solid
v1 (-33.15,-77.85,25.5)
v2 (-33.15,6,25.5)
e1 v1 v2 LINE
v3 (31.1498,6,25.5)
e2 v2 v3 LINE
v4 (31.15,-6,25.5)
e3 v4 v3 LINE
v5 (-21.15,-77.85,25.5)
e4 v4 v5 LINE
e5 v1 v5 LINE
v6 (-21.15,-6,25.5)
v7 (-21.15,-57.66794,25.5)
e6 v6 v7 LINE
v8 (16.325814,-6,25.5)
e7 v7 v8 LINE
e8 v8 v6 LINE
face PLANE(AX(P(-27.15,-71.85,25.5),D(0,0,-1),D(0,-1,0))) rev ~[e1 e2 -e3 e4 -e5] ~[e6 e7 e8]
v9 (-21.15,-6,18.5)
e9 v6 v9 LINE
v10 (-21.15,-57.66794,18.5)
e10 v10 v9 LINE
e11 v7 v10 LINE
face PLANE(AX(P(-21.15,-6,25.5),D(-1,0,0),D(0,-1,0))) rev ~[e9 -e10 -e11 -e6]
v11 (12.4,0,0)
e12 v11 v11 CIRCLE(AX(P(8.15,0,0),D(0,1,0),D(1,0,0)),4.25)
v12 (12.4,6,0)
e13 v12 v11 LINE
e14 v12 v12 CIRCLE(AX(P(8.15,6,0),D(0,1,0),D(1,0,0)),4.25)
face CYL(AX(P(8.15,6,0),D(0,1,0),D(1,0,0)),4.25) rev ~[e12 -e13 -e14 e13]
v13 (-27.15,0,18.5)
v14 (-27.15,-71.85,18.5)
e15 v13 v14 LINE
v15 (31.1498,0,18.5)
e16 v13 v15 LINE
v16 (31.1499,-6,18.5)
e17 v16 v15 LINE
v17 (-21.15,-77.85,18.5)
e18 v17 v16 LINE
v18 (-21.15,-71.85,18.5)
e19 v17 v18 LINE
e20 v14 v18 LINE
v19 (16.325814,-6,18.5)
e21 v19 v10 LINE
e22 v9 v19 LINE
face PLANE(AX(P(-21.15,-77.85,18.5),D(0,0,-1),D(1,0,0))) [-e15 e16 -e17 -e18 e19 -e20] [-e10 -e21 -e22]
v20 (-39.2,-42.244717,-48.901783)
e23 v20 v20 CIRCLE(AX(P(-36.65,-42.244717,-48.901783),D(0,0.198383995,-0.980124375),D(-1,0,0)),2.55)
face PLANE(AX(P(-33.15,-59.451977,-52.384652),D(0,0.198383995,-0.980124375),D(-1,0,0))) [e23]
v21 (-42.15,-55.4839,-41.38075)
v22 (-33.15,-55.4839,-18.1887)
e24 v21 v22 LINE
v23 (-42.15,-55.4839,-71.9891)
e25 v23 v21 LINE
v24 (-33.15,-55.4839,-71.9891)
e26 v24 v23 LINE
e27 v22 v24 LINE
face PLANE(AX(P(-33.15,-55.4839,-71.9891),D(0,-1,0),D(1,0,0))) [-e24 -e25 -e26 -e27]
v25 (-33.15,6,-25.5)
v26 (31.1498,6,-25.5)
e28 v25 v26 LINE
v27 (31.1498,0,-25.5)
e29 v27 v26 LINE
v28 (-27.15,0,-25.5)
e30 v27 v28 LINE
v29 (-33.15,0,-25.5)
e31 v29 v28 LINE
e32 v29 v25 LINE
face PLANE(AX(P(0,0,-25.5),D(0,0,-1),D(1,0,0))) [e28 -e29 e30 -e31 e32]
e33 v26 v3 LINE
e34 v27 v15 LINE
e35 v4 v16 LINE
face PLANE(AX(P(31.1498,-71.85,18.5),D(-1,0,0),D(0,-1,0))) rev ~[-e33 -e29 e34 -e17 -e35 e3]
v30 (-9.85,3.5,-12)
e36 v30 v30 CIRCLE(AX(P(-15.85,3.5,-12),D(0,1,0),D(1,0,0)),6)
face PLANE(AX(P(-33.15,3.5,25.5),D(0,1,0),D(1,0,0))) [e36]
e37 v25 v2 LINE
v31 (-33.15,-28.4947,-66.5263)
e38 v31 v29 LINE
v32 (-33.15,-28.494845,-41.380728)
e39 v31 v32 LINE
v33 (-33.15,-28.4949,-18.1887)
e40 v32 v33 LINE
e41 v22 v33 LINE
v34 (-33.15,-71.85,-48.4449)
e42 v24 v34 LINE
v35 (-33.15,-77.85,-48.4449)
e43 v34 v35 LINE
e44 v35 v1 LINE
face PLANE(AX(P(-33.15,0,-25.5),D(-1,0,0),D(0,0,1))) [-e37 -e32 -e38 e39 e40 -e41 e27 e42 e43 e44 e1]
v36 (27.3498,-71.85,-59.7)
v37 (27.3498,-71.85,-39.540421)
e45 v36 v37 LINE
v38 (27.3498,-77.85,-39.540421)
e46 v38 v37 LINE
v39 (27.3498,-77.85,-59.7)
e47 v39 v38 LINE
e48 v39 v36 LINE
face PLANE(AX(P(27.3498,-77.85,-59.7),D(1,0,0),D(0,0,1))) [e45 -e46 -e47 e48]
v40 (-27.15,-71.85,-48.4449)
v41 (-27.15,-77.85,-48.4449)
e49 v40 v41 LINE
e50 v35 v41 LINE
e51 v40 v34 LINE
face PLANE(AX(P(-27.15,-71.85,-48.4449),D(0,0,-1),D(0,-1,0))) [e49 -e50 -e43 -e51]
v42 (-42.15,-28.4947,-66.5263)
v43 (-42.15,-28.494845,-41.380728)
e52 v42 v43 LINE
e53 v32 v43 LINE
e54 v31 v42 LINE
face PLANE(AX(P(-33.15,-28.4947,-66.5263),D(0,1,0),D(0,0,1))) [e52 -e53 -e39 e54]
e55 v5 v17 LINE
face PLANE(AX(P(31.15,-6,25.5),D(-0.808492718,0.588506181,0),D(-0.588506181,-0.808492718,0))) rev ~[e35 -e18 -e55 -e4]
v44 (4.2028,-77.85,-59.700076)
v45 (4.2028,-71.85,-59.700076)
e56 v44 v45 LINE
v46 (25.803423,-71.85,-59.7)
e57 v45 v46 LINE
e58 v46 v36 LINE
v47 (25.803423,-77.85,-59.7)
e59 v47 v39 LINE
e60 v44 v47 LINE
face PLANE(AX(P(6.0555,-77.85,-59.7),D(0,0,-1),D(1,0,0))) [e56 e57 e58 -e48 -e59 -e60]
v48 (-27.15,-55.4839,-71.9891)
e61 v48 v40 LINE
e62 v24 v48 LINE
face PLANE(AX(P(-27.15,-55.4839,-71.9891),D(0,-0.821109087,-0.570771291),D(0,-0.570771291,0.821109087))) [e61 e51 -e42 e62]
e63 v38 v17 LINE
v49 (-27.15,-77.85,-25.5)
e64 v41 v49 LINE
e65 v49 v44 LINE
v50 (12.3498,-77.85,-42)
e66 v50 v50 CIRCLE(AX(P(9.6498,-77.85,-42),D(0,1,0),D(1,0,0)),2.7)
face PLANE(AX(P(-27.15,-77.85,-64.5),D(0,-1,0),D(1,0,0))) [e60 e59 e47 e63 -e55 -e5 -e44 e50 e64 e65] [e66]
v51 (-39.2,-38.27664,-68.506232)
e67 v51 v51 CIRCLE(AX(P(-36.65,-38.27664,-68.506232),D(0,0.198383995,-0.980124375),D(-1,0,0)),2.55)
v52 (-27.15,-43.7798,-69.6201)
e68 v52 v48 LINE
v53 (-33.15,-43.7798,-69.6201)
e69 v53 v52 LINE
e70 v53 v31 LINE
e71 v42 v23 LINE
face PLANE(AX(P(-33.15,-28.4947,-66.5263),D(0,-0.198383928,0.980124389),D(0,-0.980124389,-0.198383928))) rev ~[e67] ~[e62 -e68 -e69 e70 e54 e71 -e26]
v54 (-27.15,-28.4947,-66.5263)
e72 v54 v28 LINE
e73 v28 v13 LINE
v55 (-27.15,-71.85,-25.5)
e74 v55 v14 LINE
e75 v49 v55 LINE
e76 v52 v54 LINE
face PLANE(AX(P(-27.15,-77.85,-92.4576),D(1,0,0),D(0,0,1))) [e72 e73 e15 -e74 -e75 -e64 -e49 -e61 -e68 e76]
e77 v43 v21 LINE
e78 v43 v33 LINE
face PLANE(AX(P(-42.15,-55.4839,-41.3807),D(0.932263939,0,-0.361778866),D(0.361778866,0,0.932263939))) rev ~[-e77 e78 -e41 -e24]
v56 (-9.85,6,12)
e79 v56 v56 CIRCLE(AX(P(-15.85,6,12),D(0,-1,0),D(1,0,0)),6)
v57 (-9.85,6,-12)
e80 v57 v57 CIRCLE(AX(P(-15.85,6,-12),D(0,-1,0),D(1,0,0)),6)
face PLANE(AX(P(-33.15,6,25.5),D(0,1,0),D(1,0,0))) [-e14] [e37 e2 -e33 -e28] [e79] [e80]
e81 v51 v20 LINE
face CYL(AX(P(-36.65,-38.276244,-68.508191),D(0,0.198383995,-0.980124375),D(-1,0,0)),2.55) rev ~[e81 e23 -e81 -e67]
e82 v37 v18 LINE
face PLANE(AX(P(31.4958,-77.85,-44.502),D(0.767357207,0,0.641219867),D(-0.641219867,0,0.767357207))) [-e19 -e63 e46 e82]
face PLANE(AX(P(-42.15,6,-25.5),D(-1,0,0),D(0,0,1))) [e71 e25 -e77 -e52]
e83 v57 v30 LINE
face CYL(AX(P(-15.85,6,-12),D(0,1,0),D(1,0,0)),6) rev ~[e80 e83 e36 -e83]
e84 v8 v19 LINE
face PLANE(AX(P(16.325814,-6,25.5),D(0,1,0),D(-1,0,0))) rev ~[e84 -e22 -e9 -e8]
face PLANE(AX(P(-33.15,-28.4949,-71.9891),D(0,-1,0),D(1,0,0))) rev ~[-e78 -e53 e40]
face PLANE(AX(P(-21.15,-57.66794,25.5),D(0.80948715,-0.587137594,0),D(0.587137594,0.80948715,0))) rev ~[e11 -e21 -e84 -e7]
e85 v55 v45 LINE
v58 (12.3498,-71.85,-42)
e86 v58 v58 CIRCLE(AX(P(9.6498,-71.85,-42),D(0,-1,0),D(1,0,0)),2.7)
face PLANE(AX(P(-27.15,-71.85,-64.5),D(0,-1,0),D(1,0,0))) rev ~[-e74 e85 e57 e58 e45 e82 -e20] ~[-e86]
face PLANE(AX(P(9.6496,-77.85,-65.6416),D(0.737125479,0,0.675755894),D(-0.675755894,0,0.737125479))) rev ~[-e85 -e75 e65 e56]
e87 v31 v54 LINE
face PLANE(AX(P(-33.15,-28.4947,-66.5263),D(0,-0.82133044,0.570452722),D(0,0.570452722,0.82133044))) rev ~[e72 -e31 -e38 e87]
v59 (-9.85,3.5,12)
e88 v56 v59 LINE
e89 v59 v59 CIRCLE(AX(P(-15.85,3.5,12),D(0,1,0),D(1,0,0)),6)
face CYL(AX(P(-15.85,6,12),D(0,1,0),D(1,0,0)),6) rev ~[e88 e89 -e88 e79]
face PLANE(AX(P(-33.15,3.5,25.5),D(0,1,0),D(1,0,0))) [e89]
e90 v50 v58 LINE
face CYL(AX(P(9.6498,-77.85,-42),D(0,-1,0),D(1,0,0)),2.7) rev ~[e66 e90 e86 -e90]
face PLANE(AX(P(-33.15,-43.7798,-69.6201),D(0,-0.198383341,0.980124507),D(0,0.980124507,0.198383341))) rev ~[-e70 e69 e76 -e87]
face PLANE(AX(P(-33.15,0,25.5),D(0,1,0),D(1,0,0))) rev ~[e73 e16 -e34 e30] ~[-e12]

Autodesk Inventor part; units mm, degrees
ref_plane "YZ Plane" through (0, 0, 0) normal (1, 0, 0) x (0, 1, 0)
ref_plane "XZ Plane" through (0, 0, 0) normal (0, 1, 0) x (-1, 0, 0)
ref_plane "XY Plane" through (0, 0, 0) normal (0, 0, 1) x (1, 0, 0)
sketch "Sketch1" plane through (0, 0, 0) normal (0, 1, 0) x (-1, 0, 0)
  line L0 (0, -25.5) -> (-34.15, -25.5)
  line L1 (-34.15, -25.5) -> (-34.15, 0)
  line L2 (-34.15, 0) -> (-34.15, 25.5)
  line L3 (-34.15, 25.5) -> (0, 25.5)
  line L4 (0, 25.5) -> (34.15, 25.5)
  line L5 (34.15, 25.5) -> (34.15, 0)
  line L6 (34.15, 0) -> (34.15, -25.5)
  line L7 (34.15, -25.5) -> (0, -25.5)
  point P0 (0, 0)
extrude "Extrusion1" add sketch "Sketch1" along normal blind 7
sketch "Sketch3" plane through (-34.15, 0, 25.5) normal (0, 0, 1) x (1, 0, 0)
  line L0 (0, 0) -> (0, -78.85)
  point P0 (34.15, 0)
  dimension "d7" = 78.85
sketch "Sketch4" plane through (-34.15, 0, -25.5) normal (-1, 0, 0) x (0, 0, 1)
  line L0 (51, 0) -> (51, -78.85)
  line L1 (51, -78.85) -> (-39, -78.85)
  line L2 (-39, -78.85) -> (-39, -71.85)
  line L3 (0, 0) -> (-39, -71.85)
  line L4 (0, 0) -> (51, 0)
  point P0 (25.5, 0)
  dimension "d10" = 90
  dimension "d11" = 7
extrude "Extrusion2" add sketch "Sketch4" against normal blind 7
sketch "Sketch6" plane through (0, 7, 0) normal (0, 1, 0) x (1, 0, 0)
  line L0 (34.15, -25.5) -> (34.15, 25.5) projected
  line L1 (34.15, 25.5) -> (34.15, 0)
  line L2 (-34.15, 25.5) -> (-34.15, -25.5) projected
  circle A0 centre (8.15, 0) radius 5
  point P0 (0, 0)
  dimension "d20" = 10
extrude "Extrusion4" cut sketch "Sketch6" against normal blind 10
sketch "Sketch7" plane through (-27.15, 0, -25.5) normal (1, 0, 0) x (0, 0, -1)
  line L0 (-51, -78.85) -> (39, -78.85) projected
  line L1 (-51, -78.85) -> (39, -78.85)
  line L2 (39, -78.85) -> (39, -71.85) projected
  line L3 (39, -78.85) -> (39, -71.85)
  line L4 (39, -71.85) -> (-51, -71.85)
  line L5 (-51, 0) -> (-51, -78.85) projected
  line L6 (-51, -78.85) -> (-51, -71.85)
  point P0 (-25.5, 0)
sketch "Sketch8" plane through (0, 0, 0) normal (0, -1, 0) x (1, 0, 0)
  circle A0 centre (8.15, 0) radius 5 projected
  line L0 (8.15, 18.5) -> (34.15, 18.5)
  line L1 (34.15, 25.5) -> (34.15, -25.5) projected
  line L2 (8.15, 25.5) -> (34.15, 25.5)
  line L3 (8.15, 25.5) -> (-27.15, 25.5)
  line L4 (-27.15, 25.5) -> (-27.15, -25.5) projected
  line L5 (8.15, 18.5) -> (-27.15, 18.5)
  line L6 (34.15, 25.5) -> (34.15, 18.5)
  line L7 (-27.15, 25.5) -> (-27.15, 18.5)
  point P0 (0, 0)
extrude "Extrusion6" add sketch "Sketch7" along normal blind 58.5
extrude "Extrusion7" add sketch "Sketch8" along normal blind 78.75 contours L5 L4 L3 L2 L1 L0
sketch "Sketch9" plane through (31.35, 0, -25.5) normal (1, 0, 0) x (0, 0, -1)
  line L0 (-51, -78.75) -> (-51, 7) projected
  line L1 (-44, 0) -> (-44, -71.85) projected
  line L2 (-51, -78.75) -> (-44, -78.75)
  line L3 (-44, -78.75) -> (-44, -71.85)
  line L4 (-44, -71.85) -> (-51, -71.85)
  line L5 (-51, -71.85) -> (-51, -78.75)
  point P0 (-25.5, 0)
extrude "Extrusion8" cut sketch "Sketch9" along normal blind 10
sketch "Sketch10" plane through (0, 7, 0) normal (0, 1, 0) x (1, 0, 0)
  point P0 (0, 0)
sketch "Boceto11" plane through (-34.15, -78.85, -64.5) normal (0, -1, 0) x (1, 0, 0)
  line L0 (72.0718, 89.9914) -> (72.0718, 37.9883)
  line L1 (72.0718, 37.9883) -> (65.5278, 37.9883)
  line L2 (65.5278, 37.9883) -> (65.5278, 89.9914)
  line L3 (72.0718, 89.9914) -> (72.0718, 92.1751)
  line L4 (72.0718, 92.1751) -> (65.5278, 92.1751)
  line L5 (65.5278, 92.1751) -> (65.5278, 89.9914)
  point P0 (34.15, 64.5)
extrude "Extrusión9" cut sketch "Boceto11" against normal blind 1000
sketch "Boceto18" plane through (-34.15, -78.85, 25.5) normal (0, 0, 1) x (1, 0, 0)
  point P0 (34.15, 78.85)
sketch "Boceto23" plane through (-27.15, 0, -25.5) normal (0, 0.4770514, -0.8788754) x (-1, 0, 0)
  point P0 (-27.15, 12.1648)
sketch "Boceto24" plane through (-27.15, 0, -25.5) normal (0, 0, -1) x (-1, 0, 0)
  line L0 (7, -71.85) -> (7, -78.85) projected
  line L1 (7, -78.35) -> (7, -78.85)
  line L2 (7, -78.85) -> (-58.5, -78.85) projected
  line L3 (-58.5, -78.85) -> (-58.5, -77.85)
  line L4 (-58.5, -71.85) -> (-58.5, -78.85) projected
  line L5 (-58.5, -77.85) -> (6, -77.85)
  line L6 (7, -77.85) -> (7, -78.85)
  line L7 (7, -78.85) -> (-58.8392, -78.85)
  line L8 (-58.5278, 7) -> (7, 7) projected
  line L9 (7, -78.85) -> (7, 7)
  line L10 (7, 7) -> (6, 7)
  line L11 (6, 6) -> (6, -77.85)
  line L12 (-58.5278, -71.85) -> (-58.5278, 7) projected
  line L13 (-58.5278, 7) -> (-58.5278, 6)
  line L14 (-58.5278, 6) -> (6, 6)
  line L15 (7, 0) -> (7, 7) projected
  line L16 (7, 6) -> (7, 7)
  line L17 (7, 7) -> (-58.5278, 7)
  point P0 (-27.15, 0)
  dimension "d65" = 1
  dimension "d66" = 1
  dimension "d67" = 1
extrude "Extrusión19" cut sketch "Boceto24" along normal mid plane 1000
sketch "Boceto25" plane through (31.35, -71.85, -64.5) normal (0, 0, -1) x (-1, 0, 0)
  point P0 (31.35, 71.85)
sketch "Boceto27" plane through (31.3778, 0, -25.5) normal (0, 0, -1) x (-1, 0, 0)
  line L0 (0, -71.85) -> (0, 6) projected
  line L1 (0, 6) -> (0.228, 6)
  line L2 (0, 6) -> (64.5278, 6) projected
  line L3 (0.228, 6) -> (0.228, -77.85)
  line L4 (0.0278, -77.85) -> (64.5278, -77.85) projected
  line L5 (0.0278, -71.85) -> (0.0278, -77.85) projected
  line L6 (0.228, -77.85) -> (0.0278, -77.85)
  line L7 (0.0278, -77.85) -> (0, 6)
  line L8 (0, 6) -> (0, -77.85)
  line L9 (0, -77.85) -> (0.0278, -77.85)
  point P0 (31.3778, 0)
  dimension "d73" = 0.228
extrude "Extrusión21" cut sketch "Boceto27" along normal mid plane 1000
sketch "Boceto28" plane through (-33.15, 0, -25.5) normal (-1, 0, 0) x (0, 0, 1)
  point P0 (25.5, 0)
sketch "Boceto30" plane through (-33.15, 0, -25.5) normal (-1, 0, 0) x (0, 0, 1)
  point P0 (25.5, 0)
sketch "Boceto31" plane through (-33.15, 0, -25.5) normal (-1, 0, 0) x (0, 0, 1)
  circle A0 centre (64.38, -38.5153) radius 2.6
  point P0 (25.5, 0)
  point P1 (64.38, -49.4573)
sketch "Boceto32" plane through (-27.15, -71.85, 18.5) normal (0, 1, 0) x (1, 0, 0)
  circle A0 centre (47, 71.5) radius 5 projected
  circle A1 centre (47, 71.5) radius 5
  line L0 (52, 71.5) -> (58.2998, 71.5)
  line L1 (67, 83) -> (67, -7)
  line L2 (58.2998, -7) -> (-6, -7) projected
  line L3 (67, -7) -> (58.2998, -7)
  line L4 (58.2998, -7) -> (58.2998, 83)
  line L5 (47, 76.5) -> (47, 83)
  line L6 (-6, 83) -> (0, 83) projected
  line L7 (-6, 83) -> (-6, 91.5)
  line L8 (-6, 91.5) -> (67, 91.5)
  line L9 (67, 91.5) -> (67, 83)
  line L10 (-6, 83) -> (58.2998, 83)
  point P0 (27.15, 18.5)
extrude "Extrusión23" add sketch "Boceto32" against normal blind 6 contours L4 L10 L6 L7 L8 L9 L1 L3
sketch "Boceto33" plane through (-33.15, -77.85, 25.5) normal (-1, 0, 0) x (0, 0, 1)
  line L0 (0, 83.85) -> (0, 0) projected
  line L1 (0, 74.4354) -> (10.1255, 74.4354)
  line L2 (10.1255, 74.4354) -> (10.1255, 56.6115)
  line L3 (10.9445, 54.9975) -> (18.0243, 49.8171)
  line L4 (18.8039, 48.5979) -> (20.1084, 42.1205)
  line L5 (0, 11.6181) -> (18.1478, 11.6181)
  line L6 (20.1478, 13.6181) -> (20.1478, 41.7256)
  arc A0 (10.1255, 56.6115) -> (10.9445, 54.9975) centre (12.1255, 56.6115) ccw
  arc A1 (18.8039, 48.5979) -> (18.0243, 49.8171) centre (16.8433, 48.203) ccw
  arc A2 (20.1478, 41.7256) -> (20.1084, 42.1205) centre (18.1478, 41.7256) ccw
  arc A3 (18.1478, 11.6181) -> (20.1478, 13.6181) centre (18.1478, 13.6181) ccw
  point P0 (-25.5, 77.85)
  dimension "d91" = 2
extrude "Extrusión24" add sketch "Boceto33" against normal blind 6
extrude "Extrusión25" cut sketch "Boceto31" against normal blind 6
sketch "Boceto34" plane through (-27.15, -77.85, 25.5) normal (1, 0, 0) x (0, 0, -1)
  line L0 (-18.1478, 11.6181) -> (-21.8775, 11.6181)
  line L1 (-21.8775, 11.6181) -> (-21.8775, 48.067)
  line L2 (-21.8775, 48.067) -> (-10.1255, 56.8358)
  line L3 (-10.1255, 74.4354) -> (-10.1255, 56.6115) projected
  line L4 (-10.1255, 56.8358) -> (-10.1255, 48.9642)
  line L5 (-10.1255, 48.9642) -> (-16.6729, 42.1735)
  line L6 (-16.6729, 42.1735) -> (-18.1478, 11.6181)
  point P0 (25.5, 77.85)
extrude "Extrusión26" add sketch "Boceto34" against normal blind 6
fillet "Empalme5" radius 10 3 edges at (-30.15, -21.0142, 35.6255) (-30.15, -29.783, 47.3775) (-30.15, -66.2319, 47.3775)
sketch "Boceto37" plane through (-33.15, 6, 25.5) normal (0, 1, 0) x (1, 0, 0)
  circle A0 centre (41.3, 25.5) radius 6 projected
  line L0 (41.3, 25.5) -> (17.3, 25.5)
  line L1 (17.3, 25.5) -> (17.3, 13.5)
  line L2 (17.3, 13.5) -> (17.3, 37.5)
  circle A1 centre (17.3, 13.5) radius 6
  circle A2 centre (17.3, 37.5) radius 6
  point P0 (33.15, 25.5)
  dimension "d106" = 24
  dimension "d107" = 12
  dimension "d108" = 24
  dimension "d109" = 12
  dimension "d110" = 12
extrude "Extrusión29" cut sketch "Boceto37" against normal blind 2.5 contours A1 | A2
sketch "Boceto39" plane through (-27.15, -71.85, 18.5) normal (0, 1, 0) x (1, 0, 0)
  line L0 (58.2998, -7) -> (58.2998, 0)
  line L1 (58.2998, 44) -> (58.2998, 91.5)
  line L2 (-6, 91.5) -> (67, 91.5) projected
  line L3 (0, 0) -> (58.2998, 0) projected
  line L4 (58.2998, 0) -> (58.2998, -7) projected
  line L5 (58.2998, -7) -> (67, -7) projected
  line L6 (58.2998, -7) -> (67, -7)
  line L7 (67, 91.5) -> (-6, 91.5) projected
  line L8 (67, -7) -> (67, 91.5)
  line L9 (67, 91.5) -> (58.2998, 91.5)
  line L10 (58.2998, 0) -> (58.2998, 44)
  point P0 (27.15, 18.5)
extrude "Extrusión31" cut sketch "Boceto39" against normal blind 10
sketch "Boceto41" plane through (-27.15, -71.85, 18.5) normal (0, 1, 0) x (1, 0, 0)
  line L0 (58.2998, 91.5) -> (58.2998, -7) projected
  line L1 (58.2998, 91.5) -> (31.7998, 91.5)
  line L2 (31.7998, 91.5) -> (31.7998, 65)
  line L3 (31.7998, 65) -> (58.2998, 65)
  line L4 (58.2998, 65) -> (58.2998, 91.5)
  circle A0 centre (31.7998, 65) radius 6
  point P0 (27.15, 18.5)
  dimension "d124" = 26.5
  dimension "d125" = 26.5
  dimension "d126" = 12
extrude "Extrusión32" cut sketch "Boceto41" against normal blind 10 contours A0 L2 L3 | L3 L2 A0
sketch "Sketch42" plane through (-27.15, -71.85, 18.5) normal (0, 1, 0) x (1, 0, 0)
  circle A0 centre (31.7998, 65) radius 6 projected
  line L0 (31.7998, 71) -> (31.7998, 65)
  circle A1 centre (31.7998, 65) radius 18
  line L1 (0, 0) -> (0, 83) projected
  line L2 (0, 83) -> (31.7998, 83)
  line L3 (58.2998, 91.5) -> (-6, 91.5) projected
  line L4 (49.7998, 65) -> (49.7998, 0)
  line L5 (58.2998, 0) -> (0, 0) projected
  line L6 (0, 0) -> (58.2998, 0) projected
  line L7 (49.7998, 0) -> (58.2998, 0)
  line L8 (58.2998, 91.5) -> (58.2998, -7) projected
  line L9 (58.2998, 0) -> (58.2998, 91.5)
  line L10 (0, 83) -> (0, 44) projected
  line L11 (0, 83) -> (-6, 83)
  line L12 (-6, 91.5) -> (-6, 83) projected
  line L13 (-6, 83) -> (-6, 91.5)
  line L14 (58.2998, 91.5) -> (58.2998, 0) projected
  line L15 (-6, 91.5) -> (58.2998, 91.5)
  point P0 (27.15, 18.5)
  point P1 (58.2998, -7)
  dimension "d129" = 36
extrude "Extrusion33" cut sketch "Sketch42" against normal blind 10 contours A1 L2 L11 L12 L3 L8 L5 L4
sketch "Sketch43" plane through (-27.15, -71.85, 18.5) normal (0, 0, -1) x (-1, 0, 0)
  line L0 (6, -6) -> (-58.2998, -6) projected
  line L1 (0, 0) -> (-49.7998, 0) projected
  line L2 (-58.2998, -6) -> (-49.7998, -6)
  line L3 (-49.7998, -6) -> (-49.7998, 0)
  line L4 (-49.7998, 0) -> (-58.2998, 0)
  line L5 (-58.2998, 0) -> (-58.2998, -6)
  point P0 (-27.15, 71.85)
extrude "Extrusion34" add sketch "Sketch43" along normal blind 20
fillet "Fillet7" radius 7 1 edges at (31.1498, -74.85, -1.5)
fillet "Fillet8" radius 2 1 edges at (22.6498, -74.85, -1.5)
sketch "Sketch44" plane through (-33.15, 0, -25.5) normal (-1, 0, 0) x (0, 0, 1)
  line L0 (68.8577, -26.7837) -> (65.1452, -24.0136) projected
  line L1 (61.1255, -3.4146) -> (51, -3.4146) projected
  line L2 (65.1452, -24.0136) -> (51, -24.0136)
  line L3 (51, -24.0136) -> (51, -3.4146)
  line L4 (51, -3.4146) -> (65.1452, -3.4146)
  line L5 (65.1452, -3.4146) -> (65.1452, -24.0136)
  point P0 (25.5, 0)
extrude "Extrusion35" cut sketch "Sketch44" against normal blind 20
sketch "Sketch45" plane through (-33.15, 6, 25.5) normal (0, 1, 0) x (1, 0, 0)
  circle A0 centre (41.3, 25.5) radius 5 projected
  circle A1 centre (41.3, 25.5) radius 4.25
  circle A2 centre (41.3, 25.5) radius 5
  point P0 (33.15, 25.5)
  dimension "d138" = 8.5
extrude "Extrusion36" add sketch "Sketch45" against normal blind 6
sketch "Sketch46" plane through (-33.15, 0, -25.5) normal (-1, 0, 0) x (0, 0, 1)
  point P0 (25.5, 0)
sketch "Sketch47" plane through (-33.15, 0, -25.5) normal (-1, 0, 0) x (0, 0, 1)
  line L0 (-44.1201, -43.7798) -> (-41.0263, -28.4947)
  line L1 (-39, -71.85) -> (0, 0) projected
  line L2 (-41.0263, -28.4947) -> (0, 0)
  line L3 (0, 0) -> (-39, -71.85)
  line L4 (-44.1201, -43.7798) -> (-44.1201, -71.85)
  line L5 (-44.1201, -71.85) -> (-39, -71.85)
  point P0 (25.5, 0)
extrude "Extrusion37" add sketch "Sketch47" against normal blind 6
sketch "Sketch48" plane through (-33.15, 6, -25.5) normal (-1, 0, 0) x (0, 0, 1)
  point P0 (25.5, -6)
sketch "Sketch49" plane through (-33.15, 6, -25.5) normal (-1, 0, 0) x (0, 0, 1)
  point P0 (25.5, -6)
sketch "Sketch50" plane through (-33.15, 6, -25.5) normal (-1, 0, 0) x (0, 0, 1)
  line L0 (-44.1201, -49.7798) -> (-41.0263, -34.4947) projected
  line L1 (-41.0263, -34.4947) -> (-46.4891, -61.4839)
  line L2 (-39, -83.85) -> (51, -83.85) projected
  line L3 (-39, -83.85) -> (-46.4891, -83.85)
  line L4 (-46.4891, -83.85) -> (-46.4891, -61.4839)
  line L5 (-41.0263, -34.4947) -> (-39, -69.2782)
  line L6 (-39, -69.2782) -> (-39, -83.85)
  point P0 (25.5, -6)
extrude "Extrusion38" add sketch "Sketch50" against normal blind 6
sketch "Sketch51" plane through (-33.15, 6, -25.5) normal (-1, 0, 0) x (0, 0, 1)
  line L0 (-41.0263, -34.4947) -> (-46.4891, -61.4839) projected
  line L1 (-41.0263, -34.4947) -> (-46.4891, -61.4839)
  line L2 (-46.4891, -61.4839) -> (-15.8808, -61.4839)
  line L3 (-41.0263, -34.4947) -> (-15.8808, -34.4947)
  line L4 (-15.8808, -34.4947) -> (-15.8808, -61.4839)
  point P0 (25.5, -6)
extrude "Extrusion39" add sketch "Sketch51" along normal blind 9
sketch "Sketch52" plane through (-33.15, -55.4839, -71.9891) normal (0, -1, 0) x (1, 0, 0)
  line L0 (-9, 30.6084) -> (0, 53.8004)
  line L1 (0, 0) -> (0, 97.4891) projected
  line L2 (0, 30.6084) -> (0, 53.8004)
  line L3 (0, 30.6084) -> (-9, 30.6084)
  point P0 (33.15, 71.9891)
extrude "Extrusion40" add sketch "Sketch52" against normal blind 26.989
sketch "Sketch53" plane through (-33.15, -55.4839, -18.1887) normal (-0.9322642, 0, 0.3617781) x (0.3617781, 0, 0.9322642)
  point P0 (28.9496, 55.4839)
sketch "Sketch54" plane through (-33.15, 6, -25.5) normal (-1, 0, 0) x (0, 0, 1)
  line L0 (51, -72.2319) -> (51, -83.85) projected
  line L1 (51, -83.85) -> (86.3988, -83.85)
  line L2 (86.3988, -83.85) -> (86.3988, -18.2813)
  line L3 (86.3988, -18.2813) -> (51, -18.2813)
  line L4 (51, -18.2813) -> (51, -83.85)
  point P0 (25.5, -6)
extrude "Extrusion41" cut sketch "Sketch54" against normal blind 26.989
sketch "Sketch55" plane through (-33.15, -55.4839, -71.9891) normal (0, 0.198384, -0.9801244) x (-1, 0, 0)
  line L0 (9, 6.0722) -> (9, 32.5248) projected
  line L1 (9, 17.5562) -> (3.5, 17.5562)
  line L2 (9, 17.5562) -> (14.5, 17.5562) construction
  circle A0 centre (3.5, 17.5562) radius 2.55
  point P0 (-33.15, 68.6627)
  dimension "d153" = 5.5
  dimension "d154" = 180
  dimension "d155" = 5.1
extrude "Extrusion42" cut sketch "Sketch55" against normal blind 20
sketch "Sketch56" plane through (-33.15, -77.85, 25.5) normal (0, 0, 1) x (1, 0, 0)
  line L0 (0, 77.85) -> (0, 83.85) projected
  line L1 (0, 83.85) -> (12, 83.85)
  line L2 (64.2998, 83.85) -> (0, 83.85) projected
  line L3 (12, 83.85) -> (12, 0)
  line L4 (6, 0) -> (37.7998, 0) projected
  line L5 (0, 83.85) -> (0, 0) projected
  line L6 (12, 0) -> (0, 0)
  line L7 (0, 0) -> (0, 83.85)
  line L8 (0, 83.85) -> (12, 83.85)
  line L9 (12, 83.85) -> (12, 0)
  line L10 (0, 83.85) -> (64.3, 83.85)
  line L11 (64.3, 83.85) -> (64.3, 71.85)
  line L12 (64.3, 71.85) -> (0, 71.85)
  line L13 (0, 71.85) -> (0, 83.85)
  line L14 (64.2998, 0) -> (64.2998, 83.85) projected
  line L15 (64.3, 71.85) -> (12, 0)
  line L16 (64.3, 71.85) -> (54.5981, 78.9121)
  line L17 (12, 0) -> (3.5198, 8.4904)
  line L18 (3.5198, 8.4904) -> (54.5981, 78.9121)
  line L19 (12, 0) -> (64.2998, 0)
  line L20 (64.3, 71.85) -> (64.2998, 0)
  point P0 (33.15, 77.85)
  point P1 (37.7998, 0)
  point P2 (64.2998, 71.8497)
  point P3 (12, 20.182)
  point P4 (49.4758, 71.85)
  point P5 (12, 71.85)
  dimension "d158" = 12
  dimension "d159" = 64.3
  dimension "d160" = 12
  dimension "d161" = 12
  dimension "d162" = 12
extrude "Extrusion43" cut sketch "Sketch56" against normal blind 20 contours L12 L18 L3 | L14 L19 L4 L15
sketch "Sketch57" plane through (-27.15, -77.85, -64.5) normal (0, -1, 0) x (1, 0, 0)
  point P0 (27.15, 64.5)
sketch "Sketch58" plane through (-27.15, -77.85, -64.5) normal (0, -1, 0) x (1, 0, 0)
  line L0 (0.0098, 82.9715) -> (6.0098, 82.9715)
  line L1 (0.0098, 82.9715) -> (58.6458, 82.9715)
  line L2 (58.6458, 82.9715) -> (58.6458, -19.949)
  line L3 (58.6458, -19.949) -> (0.0098, -19.949)
  line L4 (0.0098, -19.949) -> (0.0098, 82.9715)
  line L5 (58.6458, 1.7715) -> (22.1928, 1.7715)
  line L6 (22.1928, 1.7715) -> (0.0098, 16.0551)
  line L7 (0.0098, 16.0551) -> (0.0098, 82.9715)
  line L8 (58.6458, 1.7715) -> (58.6458, 39.0076)
  line L9 (58.6458, 1.7715) -> (22.1928, 1.7715)
  line L10 (58.6458, 38.2245) -> (58.6458, 1.7715)
  line L11 (58.6458, 38.2245) -> (6.0098, 82.9715)
  point P0 (15.0563, 101.6492)
extrude "Extrusion44" add sketch "Sketch58" against normal blind 6
extrude "Extrusion45" cut sketch "Sketch58" against normal blind 6
extrude "Extrusion46" add sketch "Sketch58" against normal blind 6 contours L0 L11 L2 L5 L6 L4
sketch "Sketch59" plane through (-27.15, 0, -25.5) normal (1, 0, 0) x (0, 0, -1)
  line L0 (46.4891, -77.85) -> (46.4891, -55.4839) projected
  line L1 (22.9449, -71.85) -> (22.9449, -77.85) projected
  line L2 (46.4891, -55.4839) -> (22.9449, -71.85)
  line L3 (22.9449, -71.85) -> (22.9449, -77.85)
  line L4 (22.9449, -77.85) -> (46.4891, -77.85)
  line L5 (46.4891, -55.4839) -> (46.4891, -77.85) projected
  line L6 (46.4891, -77.85) -> (46.4891, -55.4839)
  line L7 (46.4891, -55.4839) -> (46.4891, -77.85)
  point P0 (-25.5, 0)
extrude "Extrusion47" cut sketch "Sketch59" along normal blind 0.1 and the other way blind 6
sketch "Sketch60" plane through (-4.9572, -77.85, -62.7285) normal (0, -1, 0) x (1, 0, 0)
  line L0 (36.107, 88.2285) -> (-22.1928, 88.2285) projected
  line L1 (36.107, 88.2285) -> (14.607, 88.2285)
  line L2 (14.607, 88.2285) -> (14.607, 20.7285)
  line L3 (14.607, 20.7285) -> (36.107, 20.7285)
  line L4 (36.107, 20.7285) -> (36.107, 88.2285)
  circle A0 centre (14.607, 20.7285) radius 2.7
  point P0 (4.9572, 62.7285)
  dimension "d176" = 21.5
  dimension "d177" = 67.5
  dimension "d178" = 5.4
extrude "Extrusion48" cut sketch "Sketch60" against normal blind 10 contours A0 L3 L2 | L2 L3 A0
sketch "Sketch61" plane through (-33.15, -77.85, 25.5) normal (0, -1, 0) x (1, 0, 0)
  line L0 (64.6458, -51.7755) -> (64.6458, -88.2285) projected
  line L1 (64.6458, -88.2285) -> (64.6458, -70.002)
  line L2 (12, -7) -> (49.4758, -7) projected
  line L3 (64.6458, -70.002) -> (12, -7)
  line L4 (12, -7) -> (64.6458, -48.437)
  line L5 (64.6458, -48.437) -> (64.6458, -70.002)
  line L6 (64.6458, -88.2285) -> (46.4193, -88.2285)
  line L7 (6.1, -74.0029) -> (28.1928, -88.2285) projected
  line L8 (46.4193, -88.2285) -> (28.1928, -88.2285)
  line L9 (28.1928, -88.2285) -> (6.1, -61.7897)
  line L10 (6.1, -61.7897) -> (6.1, -74.0029)
  line L11 (6.1, -74.0029) -> (28.1928, -88.2285)
  point P0 (33.15, -25.5)
  dimension "d181" = 18.2265
  dimension "d182" = 18.2265
extrude "Extrusion49" cut sketch "Sketch61" against normal blind 6
sketch "Sketch62" plane through (-33.15, -28.4947, -66.5263) normal (0, 0.198384, -0.9801244) x (-1, 0, 0)
  point P0 (-33.15, 41.1261)
sketch "Sketch63" plane through (-33.15, -77.85, 25.5) normal (0, -1, 0) x (1, 0, 0)
  line L0 (6, -7) -> (6, -51) projected
  line L1 (6, -7) -> (12, -7) projected
  line L2 (12, -7) -> (64.6458, -70.002)
  circle A0 centre (42.7998, -67.5) radius 2.7 projected
  line L3 (64.6458, -70.002) -> (42.7998, -67.5)
  line L4 (42.7998, -67.5) -> (53.7228, -80.5717)
  line L5 (53.7228, -80.5717) -> (64.6458, -70.002)
  line L6 (53.7228, -80.5717) -> (42.7996, -91.1416)
  line L7 (42.7996, -91.1416) -> (6, -51)
  line L8 (42.7996, -91.1416) -> (64.6458, -91.1416)
  line L9 (64.6458, -91.1416) -> (64.6458, -70.002)
  line L10 (6, -7) -> (73.4518, -7)
  line L11 (73.4518, -7) -> (73.4518, -117.9576)
  line L12 (73.4518, -117.9576) -> (6, -117.9576)
  line L13 (6, -117.9576) -> (6, -7)
  point P0 (33.15, -25.5)
extrude "Extrusion50" cut sketch "Sketch63" against normal blind 6 contours L7 L8 L9 L2 L10 L11 L12 L13
extrude "Extrusion51" add sketch "Sketch63" against normal blind 6 contours L1 L2 L3 A0 L4 L6 L7 L0 | L6 L5 L9 L8 | L5 L4 A0 L3
sketch "Sketch64" plane through (-33.15, -77.85, 25.5) normal (0, -1, 0) x (1, 0, 0)
  circle A0 centre (42.7998, -67.5) radius 2.7 projected
  line L0 (42.7998, -67.5) -> (42.7998, -70.2)
  line L1 (42.7998, -70.2) -> (42.7998, -85.2)
  line L2 (12, -7) -> (49.4758, -7) projected
  line L3 (12, -7) -> (64.6458, -70.002) projected
  line L4 (12, -7) -> (64.6458, -70.002)
  line L5 (64.6458, -70.002) -> (64.6458, -91.1416) projected
  line L6 (64.6458, -70.002) -> (64.6458, -91.1416)
  line L7 (64.6458, -91.1416) -> (42.7998, -91.1416)
  line L8 (6, -7) -> (6, -51) projected
  line L9 (42.7998, -91.1416) -> (6, -51)
  line L10 (42.7998, -85.2) -> (64.6458, -85.2)
  line L11 (45.4998, -67.5) -> (60.4998, -67.5)
  line L12 (60.4998, -67.5) -> (60.4998, -85.2)
  line L13 (60.4998, -67.5) -> (60.4998, -65.0404)
  line L14 (42.7998, -85.2) -> (37.3528, -85.2)
  line L15 (37.3528, -85.2) -> (67.2046, -85.2)
  line L16 (67.2046, -85.2) -> (67.2046, -95.398)
  line L17 (67.2046, -95.398) -> (37.3528, -95.398)
  line L18 (37.3528, -95.398) -> (37.3528, -85.2)
  line L19 (60.4998, -85.2) -> (70.2528, -85.2)
  line L20 (70.2528, -85.2) -> (70.2528, -62.331)
  line L21 (70.2528, -62.331) -> (60.4998, -62.331)
  line L22 (60.4998, -62.331) -> (60.4998, -85.2)
  point P0 (33.15, -25.5)
  dimension "d192" = 15
  dimension "d193" = 15
extrude "Extrusion52" cut sketch "Sketch64" against normal blind 6 contours L13 L3 L5 L10 L12 | L10 L5 L7 L9 L14 | L22 L21 L20 L19 L15 L5 L3 | L9 L7 L5 L15 L16 L17 L18
sketch "Sketch65" plane through (-33.15, -77.85, 25.5) normal (0, -1, 0) x (1, 0, 0)
  line L0 (12, -7) -> (60.4998, -65.0404) projected
  line L1 (60.4998, -65.0404) -> (48.9264, -75.1202)
  line L2 (60.4998, -65.0404) -> (60.4998, -85.2) projected
  line L3 (60.4998, -65.0404) -> (60.4998, -85.2)
  line L4 (48.9264, -75.1202) -> (60.4998, -88.4085)
  line L5 (60.4998, -65.0404) -> (58.8524, -86.517)
  line L6 (58.8524, -86.517) -> (37.3528, -85.2002)
  line L7 (37.3528, -85.2002) -> (48.9264, -75.1202)
  line L8 (58.8524, -86.517) -> (69.5954, -86.517)
  line L9 (69.5954, -86.517) -> (69.5954, -59.5334)
  line L10 (69.5954, -59.5334) -> (58.8524, -59.5334)
  line L11 (58.8524, -59.5334) -> (58.8524, -86.517)
  point P0 (33.15, -25.5)
  point P1 (58.8524, -63.069)
  dimension "d196" = 15.3475
extrude "Extrusion53" cut sketch "Sketch65" against normal blind 6 contours L11 L10 L9 L8 L5 L0
extrude "Extrusion54" add sketch "Sketch65" against normal blind 6 contours L5 L11 L1 | L11 L4 L1 | L6 L7 L4
sketch "Sketch66" plane through (-33.15, -77.85, 25.5) normal (0, -1, 0) x (1, 0, 0)
  line L0 (37.3528, -85.2) -> (60.4998, -85.2)
  line L1 (60.4998, -85.2) -> (60.4998, -65.0404)
  line L2 (60.4998, -65.0404) -> (37.3528, -65.0404)
  line L3 (37.3528, -65.0404) -> (37.3528, -85.2)
  line L4 (74.8766, -52.5753) -> (26.3032, -52.5753)
  line L5 (26.3032, -52.5753) -> (26.3032, -106.4614)
  line L6 (26.3032, -106.4614) -> (74.8766, -106.4614)
  line L7 (74.8766, -106.4614) -> (74.8766, -52.5753)
  line L8 (60.4998, -52.5753) -> (60.4998, -85.2)
  line L9 (26.3032, -85.2) -> (39.2055, -85.2)
  line L10 (60.4998, -65.0404) -> (39.2055, -85.2)
  point P0 (33.15, -25.5)
extrude "Extrusion55" cut sketch "Sketch66" against normal blind 6 contours L0 L1 L8 L4 L7 L6 L5 L9
extrude "Extrusion56" add sketch "Sketch66" against normal blind 6 contours L10 L1 L0
sketch "Sketch67" plane through (-33.15, -77.85, 25.5) normal (0, -1, 0) x (1, 0, 0)
  point P0 (33.15, -25.5)
sketch "Sketch68" plane through (-33.15, -77.85, 25.5) normal (0, -1, 0) x (1, 0, 0)
  line L0 (60.4998, -65.0404) -> (60.4998, -85.2) projected
  line L1 (60.4998, -85.2) -> (37.3526, -85.2) projected
  line L2 (60.4998, -85.2) -> (37.3526, -85.2)
  line L3 (37.3526, -85.2) -> (6, -51)
  line L4 (6, -51) -> (6, -7)
  line L5 (6, -7) -> (12.2668, -7)
  line L6 (12, -7) -> (60.4998, -65.0404) projected
  line L7 (60.4998, -65.0404) -> (12, -7)
  circle A0 centre (42.7998, -67.5) radius 2.7 projected
  circle A1 centre (42.7998, -67.5) radius 2.7
  point P0 (33.15, -25.5)
properties part number "DC23[R][F][T1]" material "Aluminio 6061"
